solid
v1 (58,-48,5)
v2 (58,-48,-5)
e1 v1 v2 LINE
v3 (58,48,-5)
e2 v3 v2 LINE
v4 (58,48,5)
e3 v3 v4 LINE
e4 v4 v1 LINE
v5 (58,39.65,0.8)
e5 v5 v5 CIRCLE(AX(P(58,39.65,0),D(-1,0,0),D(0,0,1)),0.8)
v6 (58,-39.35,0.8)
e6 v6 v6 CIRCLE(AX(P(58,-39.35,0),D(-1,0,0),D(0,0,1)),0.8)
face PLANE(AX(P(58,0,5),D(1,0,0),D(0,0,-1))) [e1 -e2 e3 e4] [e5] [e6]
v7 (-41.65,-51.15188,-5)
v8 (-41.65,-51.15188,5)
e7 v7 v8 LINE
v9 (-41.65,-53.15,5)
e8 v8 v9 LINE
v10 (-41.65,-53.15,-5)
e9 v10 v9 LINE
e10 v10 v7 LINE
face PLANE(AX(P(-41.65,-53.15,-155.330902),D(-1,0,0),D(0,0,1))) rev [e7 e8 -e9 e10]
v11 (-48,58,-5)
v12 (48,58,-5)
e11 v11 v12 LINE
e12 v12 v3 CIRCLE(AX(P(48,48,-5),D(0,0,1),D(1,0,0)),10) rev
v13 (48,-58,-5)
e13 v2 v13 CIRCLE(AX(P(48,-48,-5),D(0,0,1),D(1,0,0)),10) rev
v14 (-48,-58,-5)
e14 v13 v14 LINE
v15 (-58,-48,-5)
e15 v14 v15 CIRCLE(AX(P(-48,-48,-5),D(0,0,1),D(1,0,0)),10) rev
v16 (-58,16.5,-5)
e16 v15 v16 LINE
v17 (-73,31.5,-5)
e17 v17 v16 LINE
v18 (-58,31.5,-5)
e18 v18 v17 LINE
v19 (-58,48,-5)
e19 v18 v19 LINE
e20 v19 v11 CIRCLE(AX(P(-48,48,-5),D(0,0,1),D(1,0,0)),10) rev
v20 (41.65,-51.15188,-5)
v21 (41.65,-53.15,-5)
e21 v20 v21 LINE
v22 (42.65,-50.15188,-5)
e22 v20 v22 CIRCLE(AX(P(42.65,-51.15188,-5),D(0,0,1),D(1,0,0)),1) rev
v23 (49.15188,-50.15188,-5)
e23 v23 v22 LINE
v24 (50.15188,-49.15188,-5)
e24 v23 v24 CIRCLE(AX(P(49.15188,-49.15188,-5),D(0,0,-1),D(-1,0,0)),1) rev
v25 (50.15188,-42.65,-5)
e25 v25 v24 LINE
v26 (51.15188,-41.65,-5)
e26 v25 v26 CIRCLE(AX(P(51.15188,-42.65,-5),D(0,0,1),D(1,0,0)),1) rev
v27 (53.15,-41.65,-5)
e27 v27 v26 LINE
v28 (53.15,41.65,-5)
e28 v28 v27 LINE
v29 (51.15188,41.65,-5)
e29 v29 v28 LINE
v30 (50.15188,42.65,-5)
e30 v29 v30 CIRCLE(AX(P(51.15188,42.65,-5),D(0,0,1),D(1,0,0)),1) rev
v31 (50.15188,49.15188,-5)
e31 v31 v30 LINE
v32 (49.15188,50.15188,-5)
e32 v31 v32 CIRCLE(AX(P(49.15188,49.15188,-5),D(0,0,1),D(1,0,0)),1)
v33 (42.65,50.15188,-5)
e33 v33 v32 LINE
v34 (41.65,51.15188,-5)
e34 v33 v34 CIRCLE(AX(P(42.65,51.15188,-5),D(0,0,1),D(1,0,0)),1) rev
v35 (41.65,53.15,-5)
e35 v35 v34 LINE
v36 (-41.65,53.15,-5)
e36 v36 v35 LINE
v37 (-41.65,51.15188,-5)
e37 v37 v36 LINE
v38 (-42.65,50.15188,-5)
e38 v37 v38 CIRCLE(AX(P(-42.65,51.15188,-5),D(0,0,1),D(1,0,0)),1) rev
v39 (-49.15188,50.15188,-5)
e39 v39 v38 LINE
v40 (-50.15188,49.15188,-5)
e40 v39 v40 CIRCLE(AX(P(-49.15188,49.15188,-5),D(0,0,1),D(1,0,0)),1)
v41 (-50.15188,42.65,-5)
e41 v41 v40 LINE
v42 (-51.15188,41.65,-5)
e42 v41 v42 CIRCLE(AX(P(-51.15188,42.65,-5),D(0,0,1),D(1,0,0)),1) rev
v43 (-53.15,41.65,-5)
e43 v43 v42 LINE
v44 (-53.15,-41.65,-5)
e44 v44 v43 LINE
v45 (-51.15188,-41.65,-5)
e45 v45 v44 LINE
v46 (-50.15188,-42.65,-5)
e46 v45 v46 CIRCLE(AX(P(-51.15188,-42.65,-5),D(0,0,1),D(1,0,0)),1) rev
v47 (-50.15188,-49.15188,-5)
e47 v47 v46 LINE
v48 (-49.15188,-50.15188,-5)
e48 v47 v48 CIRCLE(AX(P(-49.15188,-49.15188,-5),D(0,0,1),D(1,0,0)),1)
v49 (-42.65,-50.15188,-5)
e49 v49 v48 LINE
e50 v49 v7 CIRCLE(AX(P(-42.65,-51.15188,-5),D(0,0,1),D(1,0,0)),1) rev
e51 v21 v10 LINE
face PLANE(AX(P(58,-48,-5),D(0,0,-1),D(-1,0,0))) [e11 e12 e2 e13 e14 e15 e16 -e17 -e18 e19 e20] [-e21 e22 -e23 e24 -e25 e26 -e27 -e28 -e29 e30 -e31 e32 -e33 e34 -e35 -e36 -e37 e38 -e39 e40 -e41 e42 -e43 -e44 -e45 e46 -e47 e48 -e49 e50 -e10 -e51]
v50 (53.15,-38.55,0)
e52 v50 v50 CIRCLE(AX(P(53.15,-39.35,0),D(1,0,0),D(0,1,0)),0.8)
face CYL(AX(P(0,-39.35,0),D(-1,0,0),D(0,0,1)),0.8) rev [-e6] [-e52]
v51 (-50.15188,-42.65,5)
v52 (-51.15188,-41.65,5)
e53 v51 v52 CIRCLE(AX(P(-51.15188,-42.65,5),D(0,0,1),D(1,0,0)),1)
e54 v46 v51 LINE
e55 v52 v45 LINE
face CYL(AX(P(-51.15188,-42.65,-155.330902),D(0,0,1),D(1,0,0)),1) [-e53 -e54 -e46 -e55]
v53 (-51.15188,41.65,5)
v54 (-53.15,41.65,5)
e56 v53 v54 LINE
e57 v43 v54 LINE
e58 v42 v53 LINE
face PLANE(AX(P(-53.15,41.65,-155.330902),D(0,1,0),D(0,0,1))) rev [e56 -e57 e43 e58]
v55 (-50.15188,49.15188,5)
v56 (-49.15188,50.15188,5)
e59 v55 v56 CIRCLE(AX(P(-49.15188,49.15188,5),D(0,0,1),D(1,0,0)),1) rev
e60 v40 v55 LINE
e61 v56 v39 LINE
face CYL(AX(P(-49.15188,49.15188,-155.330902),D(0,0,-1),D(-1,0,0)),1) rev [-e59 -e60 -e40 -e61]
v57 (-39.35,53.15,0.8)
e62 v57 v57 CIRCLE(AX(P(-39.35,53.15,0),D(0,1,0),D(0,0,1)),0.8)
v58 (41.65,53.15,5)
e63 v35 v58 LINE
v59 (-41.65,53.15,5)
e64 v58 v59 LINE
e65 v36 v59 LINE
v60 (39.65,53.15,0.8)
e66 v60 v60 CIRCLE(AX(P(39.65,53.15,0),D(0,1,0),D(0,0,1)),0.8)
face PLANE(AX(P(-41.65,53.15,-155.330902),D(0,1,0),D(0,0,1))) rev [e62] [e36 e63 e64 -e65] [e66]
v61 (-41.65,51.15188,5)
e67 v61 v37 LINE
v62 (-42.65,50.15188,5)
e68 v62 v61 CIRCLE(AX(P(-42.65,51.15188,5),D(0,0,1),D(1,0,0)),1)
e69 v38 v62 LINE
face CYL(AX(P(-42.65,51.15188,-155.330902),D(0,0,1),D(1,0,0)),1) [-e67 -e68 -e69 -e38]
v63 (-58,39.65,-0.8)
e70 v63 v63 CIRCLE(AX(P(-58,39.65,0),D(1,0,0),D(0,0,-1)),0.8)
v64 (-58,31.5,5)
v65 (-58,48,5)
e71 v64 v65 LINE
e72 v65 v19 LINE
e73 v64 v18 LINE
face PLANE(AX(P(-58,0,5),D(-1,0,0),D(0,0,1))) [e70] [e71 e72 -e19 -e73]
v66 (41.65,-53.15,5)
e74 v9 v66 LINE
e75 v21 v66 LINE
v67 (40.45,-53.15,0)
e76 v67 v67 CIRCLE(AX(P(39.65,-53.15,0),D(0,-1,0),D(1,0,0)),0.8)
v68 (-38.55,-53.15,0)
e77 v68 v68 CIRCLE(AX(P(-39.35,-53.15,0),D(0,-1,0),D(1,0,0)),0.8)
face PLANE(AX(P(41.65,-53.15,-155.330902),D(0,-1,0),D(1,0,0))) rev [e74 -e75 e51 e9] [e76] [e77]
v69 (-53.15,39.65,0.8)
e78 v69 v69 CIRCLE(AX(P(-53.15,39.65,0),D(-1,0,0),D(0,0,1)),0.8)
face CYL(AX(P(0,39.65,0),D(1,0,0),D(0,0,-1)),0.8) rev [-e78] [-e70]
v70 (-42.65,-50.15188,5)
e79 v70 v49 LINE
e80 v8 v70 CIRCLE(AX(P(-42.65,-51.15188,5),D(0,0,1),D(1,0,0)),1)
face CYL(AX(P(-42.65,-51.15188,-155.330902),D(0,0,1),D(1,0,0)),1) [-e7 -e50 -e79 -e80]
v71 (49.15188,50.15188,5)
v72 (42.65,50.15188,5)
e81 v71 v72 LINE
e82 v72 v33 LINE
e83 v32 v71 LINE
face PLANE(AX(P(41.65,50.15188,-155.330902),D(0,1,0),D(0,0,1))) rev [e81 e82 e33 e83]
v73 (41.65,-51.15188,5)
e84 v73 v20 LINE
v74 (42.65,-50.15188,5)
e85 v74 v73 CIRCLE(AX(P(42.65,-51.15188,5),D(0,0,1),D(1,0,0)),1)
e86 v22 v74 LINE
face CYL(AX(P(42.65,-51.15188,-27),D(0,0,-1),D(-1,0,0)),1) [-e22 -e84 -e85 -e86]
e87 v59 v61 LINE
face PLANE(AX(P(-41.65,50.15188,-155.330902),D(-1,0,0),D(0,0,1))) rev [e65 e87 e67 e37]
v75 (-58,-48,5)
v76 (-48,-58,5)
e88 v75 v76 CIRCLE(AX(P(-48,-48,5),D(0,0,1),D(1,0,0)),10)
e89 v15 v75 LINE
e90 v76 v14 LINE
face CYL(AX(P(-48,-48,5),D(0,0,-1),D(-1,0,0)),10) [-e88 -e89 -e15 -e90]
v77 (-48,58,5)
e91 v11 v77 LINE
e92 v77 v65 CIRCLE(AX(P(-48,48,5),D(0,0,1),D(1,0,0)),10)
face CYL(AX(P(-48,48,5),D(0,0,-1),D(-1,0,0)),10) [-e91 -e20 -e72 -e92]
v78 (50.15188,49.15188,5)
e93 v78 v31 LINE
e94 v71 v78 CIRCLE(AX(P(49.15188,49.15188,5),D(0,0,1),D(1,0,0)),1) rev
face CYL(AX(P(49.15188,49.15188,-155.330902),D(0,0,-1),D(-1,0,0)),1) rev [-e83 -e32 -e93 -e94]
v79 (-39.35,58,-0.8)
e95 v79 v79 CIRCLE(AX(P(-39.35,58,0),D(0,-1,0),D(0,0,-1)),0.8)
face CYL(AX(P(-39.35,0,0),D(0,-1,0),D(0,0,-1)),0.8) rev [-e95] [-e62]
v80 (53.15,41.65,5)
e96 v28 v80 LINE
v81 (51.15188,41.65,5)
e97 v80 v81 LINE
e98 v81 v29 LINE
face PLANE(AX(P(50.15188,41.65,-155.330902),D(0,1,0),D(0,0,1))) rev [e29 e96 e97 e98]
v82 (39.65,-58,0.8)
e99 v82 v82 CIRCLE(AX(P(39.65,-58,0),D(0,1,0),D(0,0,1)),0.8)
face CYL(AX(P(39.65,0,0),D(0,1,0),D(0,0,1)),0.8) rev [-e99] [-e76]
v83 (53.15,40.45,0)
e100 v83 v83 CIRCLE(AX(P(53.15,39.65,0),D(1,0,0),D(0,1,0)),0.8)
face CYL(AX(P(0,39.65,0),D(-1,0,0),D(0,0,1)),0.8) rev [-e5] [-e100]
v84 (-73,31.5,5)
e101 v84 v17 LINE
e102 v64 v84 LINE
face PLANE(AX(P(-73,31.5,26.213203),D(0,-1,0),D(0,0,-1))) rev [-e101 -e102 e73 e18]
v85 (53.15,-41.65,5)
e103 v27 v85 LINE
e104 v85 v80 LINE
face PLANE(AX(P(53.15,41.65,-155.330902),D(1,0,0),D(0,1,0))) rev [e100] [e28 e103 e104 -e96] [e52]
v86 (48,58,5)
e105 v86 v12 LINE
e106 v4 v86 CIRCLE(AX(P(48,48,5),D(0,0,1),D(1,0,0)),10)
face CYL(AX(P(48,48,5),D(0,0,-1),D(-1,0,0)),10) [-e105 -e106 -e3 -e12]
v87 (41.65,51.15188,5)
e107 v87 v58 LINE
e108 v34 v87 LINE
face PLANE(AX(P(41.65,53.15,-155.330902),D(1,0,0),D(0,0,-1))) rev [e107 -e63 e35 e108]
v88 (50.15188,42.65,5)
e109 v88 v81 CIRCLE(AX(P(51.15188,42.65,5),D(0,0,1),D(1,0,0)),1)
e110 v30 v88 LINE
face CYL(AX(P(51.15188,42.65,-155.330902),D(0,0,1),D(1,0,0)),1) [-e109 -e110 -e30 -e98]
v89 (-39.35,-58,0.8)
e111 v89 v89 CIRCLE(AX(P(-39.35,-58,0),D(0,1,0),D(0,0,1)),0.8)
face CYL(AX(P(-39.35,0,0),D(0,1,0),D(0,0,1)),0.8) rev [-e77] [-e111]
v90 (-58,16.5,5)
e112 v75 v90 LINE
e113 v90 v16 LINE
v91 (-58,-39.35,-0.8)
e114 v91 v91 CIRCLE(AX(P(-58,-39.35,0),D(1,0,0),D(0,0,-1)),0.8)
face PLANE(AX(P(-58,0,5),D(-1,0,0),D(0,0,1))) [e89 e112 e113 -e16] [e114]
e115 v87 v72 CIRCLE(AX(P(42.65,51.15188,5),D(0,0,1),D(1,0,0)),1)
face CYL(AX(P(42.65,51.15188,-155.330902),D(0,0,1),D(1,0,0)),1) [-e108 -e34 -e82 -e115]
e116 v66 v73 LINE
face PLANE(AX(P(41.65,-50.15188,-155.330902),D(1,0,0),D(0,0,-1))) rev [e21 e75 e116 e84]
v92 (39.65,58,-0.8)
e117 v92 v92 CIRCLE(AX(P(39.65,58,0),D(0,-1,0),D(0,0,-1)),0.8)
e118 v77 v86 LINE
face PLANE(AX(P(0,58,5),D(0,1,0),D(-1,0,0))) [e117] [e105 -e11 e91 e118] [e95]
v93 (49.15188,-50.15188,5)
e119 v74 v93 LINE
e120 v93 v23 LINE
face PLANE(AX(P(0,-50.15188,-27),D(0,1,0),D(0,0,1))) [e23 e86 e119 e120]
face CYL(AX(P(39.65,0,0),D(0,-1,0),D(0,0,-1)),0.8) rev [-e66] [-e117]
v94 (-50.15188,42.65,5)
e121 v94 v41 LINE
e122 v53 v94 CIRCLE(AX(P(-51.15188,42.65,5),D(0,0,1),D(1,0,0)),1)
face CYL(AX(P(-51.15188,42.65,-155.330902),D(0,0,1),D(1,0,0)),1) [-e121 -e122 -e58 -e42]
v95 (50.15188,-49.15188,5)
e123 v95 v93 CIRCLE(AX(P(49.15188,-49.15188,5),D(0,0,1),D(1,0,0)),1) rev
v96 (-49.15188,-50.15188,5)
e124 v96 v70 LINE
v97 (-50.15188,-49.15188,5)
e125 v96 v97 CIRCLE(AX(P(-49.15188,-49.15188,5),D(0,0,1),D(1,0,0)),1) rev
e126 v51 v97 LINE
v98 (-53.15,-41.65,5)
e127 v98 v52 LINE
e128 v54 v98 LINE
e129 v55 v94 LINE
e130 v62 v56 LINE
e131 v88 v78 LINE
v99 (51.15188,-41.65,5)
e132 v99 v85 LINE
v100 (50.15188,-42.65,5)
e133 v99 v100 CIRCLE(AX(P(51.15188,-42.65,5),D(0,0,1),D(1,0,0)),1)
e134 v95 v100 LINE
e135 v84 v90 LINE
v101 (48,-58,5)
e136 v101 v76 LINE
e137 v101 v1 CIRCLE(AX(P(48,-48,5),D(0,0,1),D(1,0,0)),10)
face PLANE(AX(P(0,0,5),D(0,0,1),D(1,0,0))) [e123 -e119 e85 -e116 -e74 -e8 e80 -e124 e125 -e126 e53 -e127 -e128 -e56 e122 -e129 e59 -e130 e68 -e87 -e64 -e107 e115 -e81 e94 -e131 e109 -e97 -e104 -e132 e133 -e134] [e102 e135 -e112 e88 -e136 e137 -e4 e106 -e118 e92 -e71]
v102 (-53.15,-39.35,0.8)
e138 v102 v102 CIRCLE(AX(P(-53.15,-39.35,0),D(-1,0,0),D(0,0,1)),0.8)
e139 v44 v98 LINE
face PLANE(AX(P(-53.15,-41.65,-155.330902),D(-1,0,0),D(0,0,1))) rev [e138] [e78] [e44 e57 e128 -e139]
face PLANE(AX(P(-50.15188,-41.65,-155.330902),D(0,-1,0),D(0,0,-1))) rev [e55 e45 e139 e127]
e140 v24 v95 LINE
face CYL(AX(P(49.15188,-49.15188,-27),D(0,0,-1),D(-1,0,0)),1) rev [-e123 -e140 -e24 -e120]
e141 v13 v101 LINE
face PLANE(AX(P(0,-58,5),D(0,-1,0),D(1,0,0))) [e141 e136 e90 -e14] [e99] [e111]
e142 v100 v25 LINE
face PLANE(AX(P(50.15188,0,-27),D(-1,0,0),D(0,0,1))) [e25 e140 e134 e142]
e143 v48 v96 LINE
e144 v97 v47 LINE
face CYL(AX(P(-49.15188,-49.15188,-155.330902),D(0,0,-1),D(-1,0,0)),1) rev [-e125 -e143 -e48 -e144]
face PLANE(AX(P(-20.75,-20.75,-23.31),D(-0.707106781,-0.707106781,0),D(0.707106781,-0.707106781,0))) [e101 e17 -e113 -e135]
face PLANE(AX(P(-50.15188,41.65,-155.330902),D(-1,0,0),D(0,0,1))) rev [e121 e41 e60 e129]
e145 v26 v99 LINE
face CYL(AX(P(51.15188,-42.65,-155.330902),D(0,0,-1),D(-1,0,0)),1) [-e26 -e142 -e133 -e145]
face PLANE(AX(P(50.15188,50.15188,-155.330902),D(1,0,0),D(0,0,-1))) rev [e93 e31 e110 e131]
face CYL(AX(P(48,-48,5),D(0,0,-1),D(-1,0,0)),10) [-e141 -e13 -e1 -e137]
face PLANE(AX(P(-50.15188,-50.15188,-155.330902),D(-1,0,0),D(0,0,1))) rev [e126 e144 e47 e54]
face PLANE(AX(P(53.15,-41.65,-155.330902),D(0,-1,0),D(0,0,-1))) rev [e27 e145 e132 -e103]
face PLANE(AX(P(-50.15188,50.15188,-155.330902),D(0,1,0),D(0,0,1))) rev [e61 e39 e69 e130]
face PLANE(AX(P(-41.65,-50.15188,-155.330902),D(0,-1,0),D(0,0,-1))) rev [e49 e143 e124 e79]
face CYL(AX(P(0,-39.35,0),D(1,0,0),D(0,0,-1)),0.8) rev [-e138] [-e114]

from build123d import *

# Parameters (mm, degrees)
BASE_DEPTH                     = 5
ARM_DEPTH                      = 5
CUT_EXTRUDE1_DEPTH             = 91.09217483320299
BOSS_EXTRUDE4_DEPTH            = 7
BOSS_EXTRUDE5_DEPTH            = 4
BOSS_EXTRUDE6_DEPTH            = 1
CLEARANCE_DEPTH                = 20
M2X0_4_TAPPED_HOLE1_AT_2_COUNT = 2
M2X0_4_TAPPED_HOLE1_AT_2_PITCH = 79
M2X0_4_TAPPED_HOLE2_AT_2_COUNT = 2
M2X0_4_TAPPED_HOLE2_AT_2_PITCH = 79
EXTENDER_DEPTH                 = 18.310000000000002
ANGLED_HORIZONTAL_DEPTH        = 30.405592
BOSS_EXTRUDE9_DEPTH            = 4
BOSS_EXTRUDE10_DEPTH           = 1
BOSS_EXTRUDE11_START           = -5
BOSS_EXTRUDE11_DEPTH           = 10
FILLET1_R                      = 1
FILLET2_R                      = 10
SPLIT1_START                   = -38.162950904
SPLIT1_DEPTH                   = 33.162950904


# Read off the part's stored shape, not the designer's step: Split1
with BuildPart() as part:
    # Sketch1 → base (new, symmetric)
    with BuildSketch(Plane.XY):
        Polygon((58.00000000000011, 58.00000000000005), (58.00000000000011, -58.00000000000005), (-58.00000000000008, -58.00000000000009), (-58.00000000000008, 58.00000000000009), align=None)
        Polygon((-41.5, 53.00000000000001), (41.5, 53.00000000000001), (41.5, 50.00188016), (50.00188015999998, 50.00188015999996), (50.00188015999998, 41.49999999999998), (52.999999999999986, 41.49999999999998), (52.999999999999986, -41.49999999999998), (50.00188015999996, -41.499999999999964), (50.00188015999999, -50.001880160000006), (41.499999999999964, -50.00188015999996), (41.49999999999998, -52.99999999999998), (-41.5, -53.00000000000001), (-41.5, -50.00188016), (-50.00188015999999, -50.001880160000006), (-50.00188015999996, -41.499999999999964), (-52.999999999999986, -41.49999999999998), (-52.999999999999986, 41.49999999999998), (-50.00188015999998, 41.49999999999998), (-50.00188015999998, 50.00188015999996), (-41.5, 50.00188016), align=None, mode=Mode.SUBTRACT)
    extrude(amount=BASE_DEPTH, both=True)

    # Sketch2 → arm (add, symmetric)
    with BuildSketch(Plane(origin=(0, 0, 0), x_dir=(0.7071067811865476, -0.7071067811865475, 0), z_dir=(0.7071067811865475, 0.7071067811865476, 0))):
        Polygon((70.9254691007821, 5), (82.02438661763962, 5), (82.02438661763962, 23.310000000000002), (5.0243866176396255, 23.30999999999999), (16.33438661763979, 12), (70.9254691007821, 12), align=None)
    extrude(amount=ARM_DEPTH, both=True)

    # Sketch3 → Cut-Extrude1 (cut, through all)
    with BuildSketch(Plane.XY):
        Polygon((54.81801948466061, -61.889087296526085), (61.88908729652609, -54.81801948466061), (58.00000000000011, -50.928932188134624), (58.0000000000001, -58.00000000000005), (50.92893218813458, -58.00000000000006), align=None)
    extrude(amount=-CUT_EXTRUDE1_DEPTH, mode=Mode.SUBTRACT)

    # Sketch5 → Boss-Extrude4 (add)
    with BuildSketch(Plane(origin=(0, 0, -5), x_dir=(-1, 0, 0), z_dir=(0, 0, -1))):
        Polygon((-50.15188015999995, -50.151880159999976), (-46.61634625406723, -53.68741406593269), (-43.080812348134494, -50.15188015999998), align=None)
        Polygon((-53.68741406593271, -46.61634625406722), (-50.15188015999995, -50.151880159999976), (-50.15188015999996, -43.08081234813448), align=None)
    extrude(amount=BOSS_EXTRUDE4_DEPTH)

    # Sketch9 → Boss-Extrude5 (add)
    with BuildSketch(Plane(origin=(10.01771845904714, -10.017718459047138, -14.167193308819991), x_dir=(0.8660254037844407, 0.2886751345948079, 0.40824829046386213), z_dir=(-0.4999999999999964, 0.4999999999999963, 0.7071067811865527))):
        Polygon((-9.25319791566329, -10.296687914526352), (12.79220976938526, 5.291769353593638), (-8.569750190631026, 35.50214284791941), (-30.61515787567957, 19.913685579799417), align=None)
        Polygon((-8.80889650236913, 34.10829599780206), (-29.221311025562215, 19.67453926806133), (-9.014051603925173, -8.902841064409014), (11.39836291926792, 5.530915665331709), align=None, mode=Mode.SUBTRACT)
    extrude(amount=BOSS_EXTRUDE5_DEPTH)

    # Sketch9<2> → Boss-Extrude6 (add)
    with BuildSketch(Plane(origin=(10.01771845904714, -10.017718459047138, -14.167193308819991), x_dir=(0.8660254037844407, 0.2886751345948079, 0.40824829046386213), z_dir=(-0.4999999999999964, 0.4999999999999963, 0.7071067811865527))):
        Polygon((-9.014051603925173, -8.902841064409014), (11.39836291926792, 5.530915665331709), (-8.80889650236913, 34.10829599780206), (-29.221311025562215, 19.67453926806133), align=None)
    extrude(amount=BOSS_EXTRUDE6_DEPTH)

    # Sketch7 → clearance (cut)
    with BuildSketch(Plane.XY.offset(15)):
        Polygon((-41.65, 53.150000000000006), (41.649999999999984, 53.150000000000006), (41.649999999999984, 50.15188016), (50.151880159999976, 50.15188016), (50.151880159999976, 41.64999999999998), (53.149999999999984, 41.64999999999998), (53.14999999999999, -41.64999999999996), (50.15188015999996, -41.64999999999996), (50.15188015999996, -50.15188015999998), (41.64999999999998, -50.15188015999998), (41.64999999999998, -53.14999999999998), (-41.65, -53.149999999999984), (-41.65, -50.15188016), (-50.15188015999999, -50.15188016), (-50.15188015999999, -41.64999999999998), (-53.149999999999984, -41.64999999999998), (-53.149999999999984, 41.64999999999998), (-50.151880159999976, 41.64999999999998), (-50.151880159999976, 50.15188015999996), (-41.65, 50.15188015999996), align=None)
    extrude(amount=-CLEARANCE_DEPTH, mode=Mode.SUBTRACT)

    # Sketch12 → M2x0.4 Tapped Hole1 (revolve, cut)
    with BuildSketch(Plane(origin=(-39.350000000000016, 0, 0), x_dir=(0, 0, -1), z_dir=(1, 0, 0))):
        Polygon((0, 0), (-1.421e-14, 58.00000000000009), (0.7999999999999855, 58.00000000000009), (0.7999999999999883, -1.46e-15), align=None)
    m2x0_4_tapped_hole1 = revolve(axis=Axis((-39.350000000000016, -6.349999999999991, 0), (0, 1, 0)), mode=Mode.SUBTRACT)

    # M2x0.4 Tapped Hole1 at 2: M2x0.4 Tapped Hole1 ×2
    with Locations(*[(i * M2X0_4_TAPPED_HOLE1_AT_2_PITCH, 0, 0) for i in range(1, M2X0_4_TAPPED_HOLE1_AT_2_COUNT)]):
        add(m2x0_4_tapped_hole1, mode=Mode.SUBTRACT)

    # Mirror1: M2x0.4 Tapped Hole1 across plane
    add(m2x0_4_tapped_hole1.mirror(Plane.ZX), mode=Mode.SUBTRACT)

    # Mirror1 copy 1 sketch → Mirror1 copy 1 (revolve, cut)
    with BuildSketch(Plane(origin=(39.649999999999984, 0, 0), x_dir=(0, 0, -1), z_dir=(1, 0, 0))):
        Polygon((0, 0), (-1.421e-14, -58.00000000000009), (0.7999999999999855, -58.00000000000009), (0.7999999999999883, 1.46e-15), align=None)
    revolve(axis=Axis((39.649999999999984, 6.349999999999991, 0), (0, 1, 0)), mode=Mode.SUBTRACT)

    # Sketch15 → M2x0.4 Tapped Hole2 (revolve, cut)
    with BuildSketch(Plane.ZX.offset(39.65)):
        Polygon((0, 0), (-1.421e-14, 58.00000000000011), (0.7999999999999923, 58.00000000000011), (0.7999999999999883, -1.46e-15), align=None)
    m2x0_4_tapped_hole2 = revolve(axis=Axis((-6.349999999999991, 39.65, 0), (1, 0, 0)), mode=Mode.SUBTRACT)

    # M2x0.4 Tapped Hole2 at 2: M2x0.4 Tapped Hole2 ×2
    with Locations(*[(0, -i * M2X0_4_TAPPED_HOLE2_AT_2_PITCH, 0) for i in range(1, M2X0_4_TAPPED_HOLE2_AT_2_COUNT)]):
        add(m2x0_4_tapped_hole2, mode=Mode.SUBTRACT)

    # Mirror2: M2x0.4 Tapped Hole2 across plane
    add(m2x0_4_tapped_hole2.mirror(Plane(origin=(0, 0, 0), x_dir=(0, 0, 1), z_dir=(1, 0, 0))), mode=Mode.SUBTRACT)

    # Mirror2 copy 1 sketch → Mirror2 copy 1 (revolve, cut)
    with BuildSketch(Plane.ZX.offset(-39.35)):
        Polygon((0, 0), (-1.421e-14, -58.00000000000011), (0.7999999999999923, -58.00000000000011), (0.7999999999999883, 1.46e-15), align=None)
    revolve(axis=Axis((6.349999999999991, -39.35, 0), (1, 0, 0)), mode=Mode.SUBTRACT)

    # Sketch16 → extender (add)
    with BuildSketch(Plane(origin=(0, 0, -5), x_dir=(-1, 0, 0), z_dir=(0, 0, -1))):
        Polygon((53.149999999999984, 21.649999999999977), (109.71854249492377, 78.21854249492374), (109.71854249492377, 68.21854249492375), (53.14999999999998, 11.649999999999949), align=None)
    extrude(amount=EXTENDER_DEPTH)

    # Sketch17 → angled horizontal (add)
    with BuildSketch(Plane(origin=(-15.749999999999996, -15.75, 0), x_dir=(0.7071067811865476, -0.7071067811865475, 0), z_dir=(0.7071067811865475, 0.7071067811865476, 0))):
        Polygon((-132.8915872327537, 23.310000000000006), (-132.8915872327537, 5), (-121.58158723275366, 5), (-121.58158723275366, 12), (-110.27158723275356, 23.310000000000006), align=None)
    extrude(amount=ANGLED_HORIZONTAL_DEPTH)

    # Sketch19 → Boss-Extrude9 (add)
    with BuildSketch(Plane(origin=(-47.228223086970885, 47.22822308697087, -66.79079361637689), x_dir=(0.8660254037844398, 0.2886751345948101, -0.4082482904638625), z_dir=(0.49999999999999806, -0.4999999999999979, 0.7071067811865506))):
        Polygon((-55.75778860387471, 55.47372790481981), (-34.39582864385848, 25.263354410494006), (-12.350420958809925, 40.85181167861396), (-33.71238091882616, 71.06218517293976), align=None)
        Polygon((-54.36394175375736, 55.234581593081714), (-33.95152723056426, 69.66833832282242), (-13.744267808927273, 41.09095799035208), (-34.15668233212039, 26.65720126061137), align=None, mode=Mode.SUBTRACT)
    extrude(amount=BOSS_EXTRUDE9_DEPTH)

    # Sketch19<2> → Boss-Extrude10 (add)
    with BuildSketch(Plane(origin=(-47.228223086970885, 47.22822308697087, -66.79079361637689), x_dir=(0.8660254037844398, 0.2886751345948101, -0.4082482904638625), z_dir=(0.49999999999999806, -0.4999999999999979, 0.7071067811865506))):
        Polygon((-34.15668233212039, 26.65720126061137), (-54.36394175375736, 55.234581593081714), (-33.95152723056426, 69.66833832282242), (-13.744267808927273, 41.09095799035208), align=None)
    extrude(amount=BOSS_EXTRUDE10_DEPTH)

    # Sketch21 → Boss-Extrude11 (add)
    with BuildSketch(Plane.XY.offset(BOSS_EXTRUDE11_START)):
        Polygon((-58.00000000000008, 16.500000000000064), (-58.00000000000008, 31.500000000000057), (-73.00000000000009, 31.500000000000057), align=None)
    extrude(amount=BOSS_EXTRUDE11_DEPTH)

    # Fillet1
    fillet1_edges = [part.edges().sort_by_distance(p)[0] for p in [
        (50.15188015999996, -50.151880159999976, -3.5),
        (-41.65, 50.15188015999996, 0),
        (41.649999999999984, 50.15188016, 0),
        (50.151880159999976, 50.15188016, 0),
        (50.151880159999976, 41.64999999999998, 0),
        (50.15188015999996, -41.64999999999996, 0),
        (41.64999999999998, -50.15188015999998, 0),
        (-41.65, -50.15188016, 0),
        (-50.15188015999999, -50.15188016, 0),
        (-50.15188015999999, -41.64999999999998, 0),
        (-50.151880159999976, 41.64999999999998, 0),
        (-50.151880159999976, 50.15188015999996, 0),
    ]]
    fillet(fillet1_edges, radius=FILLET1_R)

    # Fillet2
    fillet2_edges = [part.edges().sort_by_distance(p)[0] for p in [
        (58.0000000000001, -58.00000000000005, -9.155000000000001),
        (58.00000000000011, 58.00000000000005, 0),
        (-58.00000000000008, 58.00000000000009, 0),
        (-58.00000000000008, -58.00000000000009, 0),
    ]]
    fillet(fillet2_edges, radius=FILLET2_R)

    # Split1 outline → Split1 (cut)
    with BuildSketch(Plane.XY.offset(SPLIT1_START)):
        with BuildLine():
            Line((-53.15, 11.65), (-53.15, 34.058116908))
            Line((-53.15, 34.058116908), (31.059997068, -50.15188016))
            Line((31.059997068, -50.15188016), (43.080812348, -50.15188016))
            Line((43.080812348, -50.15188016), (50.588190451, -57.659258263))
            ThreePointArc((50.588190451, -57.659258263), (55.071067812, -55.071067812), (57.659258263, -50.588190451))
            Line((57.659258263, -50.588190451), (50.15188016, -43.080812348))
            Line((50.15188016, -43.080812348), (50.15188016, -31.059997068))
            Line((50.15188016, -31.059997068), (-53.15, 72.241883092))
            Line((-53.15, 72.241883092), (-53.15, 72.24432683))
            Line((-53.15, 72.24432683), (-76.424001385, 95.518328215))
            Line((-76.424001385, 95.518328215), (-80.2211648, 91.7211648))
            Line((-80.2211648, 91.7211648), (-88.218542495, 99.718542495))
            Line((-88.218542495, 99.718542495), (-109.718542495, 78.218542495))
            Line((-109.718542495, 78.218542495), (-109.718542495, 68.218542495))
            Line((-109.718542495, 68.218542495), (-53.15, 11.65))
        make_face()
    extrude(amount=SPLIT1_DEPTH, mode=Mode.SUBTRACT)


solid = part.part
